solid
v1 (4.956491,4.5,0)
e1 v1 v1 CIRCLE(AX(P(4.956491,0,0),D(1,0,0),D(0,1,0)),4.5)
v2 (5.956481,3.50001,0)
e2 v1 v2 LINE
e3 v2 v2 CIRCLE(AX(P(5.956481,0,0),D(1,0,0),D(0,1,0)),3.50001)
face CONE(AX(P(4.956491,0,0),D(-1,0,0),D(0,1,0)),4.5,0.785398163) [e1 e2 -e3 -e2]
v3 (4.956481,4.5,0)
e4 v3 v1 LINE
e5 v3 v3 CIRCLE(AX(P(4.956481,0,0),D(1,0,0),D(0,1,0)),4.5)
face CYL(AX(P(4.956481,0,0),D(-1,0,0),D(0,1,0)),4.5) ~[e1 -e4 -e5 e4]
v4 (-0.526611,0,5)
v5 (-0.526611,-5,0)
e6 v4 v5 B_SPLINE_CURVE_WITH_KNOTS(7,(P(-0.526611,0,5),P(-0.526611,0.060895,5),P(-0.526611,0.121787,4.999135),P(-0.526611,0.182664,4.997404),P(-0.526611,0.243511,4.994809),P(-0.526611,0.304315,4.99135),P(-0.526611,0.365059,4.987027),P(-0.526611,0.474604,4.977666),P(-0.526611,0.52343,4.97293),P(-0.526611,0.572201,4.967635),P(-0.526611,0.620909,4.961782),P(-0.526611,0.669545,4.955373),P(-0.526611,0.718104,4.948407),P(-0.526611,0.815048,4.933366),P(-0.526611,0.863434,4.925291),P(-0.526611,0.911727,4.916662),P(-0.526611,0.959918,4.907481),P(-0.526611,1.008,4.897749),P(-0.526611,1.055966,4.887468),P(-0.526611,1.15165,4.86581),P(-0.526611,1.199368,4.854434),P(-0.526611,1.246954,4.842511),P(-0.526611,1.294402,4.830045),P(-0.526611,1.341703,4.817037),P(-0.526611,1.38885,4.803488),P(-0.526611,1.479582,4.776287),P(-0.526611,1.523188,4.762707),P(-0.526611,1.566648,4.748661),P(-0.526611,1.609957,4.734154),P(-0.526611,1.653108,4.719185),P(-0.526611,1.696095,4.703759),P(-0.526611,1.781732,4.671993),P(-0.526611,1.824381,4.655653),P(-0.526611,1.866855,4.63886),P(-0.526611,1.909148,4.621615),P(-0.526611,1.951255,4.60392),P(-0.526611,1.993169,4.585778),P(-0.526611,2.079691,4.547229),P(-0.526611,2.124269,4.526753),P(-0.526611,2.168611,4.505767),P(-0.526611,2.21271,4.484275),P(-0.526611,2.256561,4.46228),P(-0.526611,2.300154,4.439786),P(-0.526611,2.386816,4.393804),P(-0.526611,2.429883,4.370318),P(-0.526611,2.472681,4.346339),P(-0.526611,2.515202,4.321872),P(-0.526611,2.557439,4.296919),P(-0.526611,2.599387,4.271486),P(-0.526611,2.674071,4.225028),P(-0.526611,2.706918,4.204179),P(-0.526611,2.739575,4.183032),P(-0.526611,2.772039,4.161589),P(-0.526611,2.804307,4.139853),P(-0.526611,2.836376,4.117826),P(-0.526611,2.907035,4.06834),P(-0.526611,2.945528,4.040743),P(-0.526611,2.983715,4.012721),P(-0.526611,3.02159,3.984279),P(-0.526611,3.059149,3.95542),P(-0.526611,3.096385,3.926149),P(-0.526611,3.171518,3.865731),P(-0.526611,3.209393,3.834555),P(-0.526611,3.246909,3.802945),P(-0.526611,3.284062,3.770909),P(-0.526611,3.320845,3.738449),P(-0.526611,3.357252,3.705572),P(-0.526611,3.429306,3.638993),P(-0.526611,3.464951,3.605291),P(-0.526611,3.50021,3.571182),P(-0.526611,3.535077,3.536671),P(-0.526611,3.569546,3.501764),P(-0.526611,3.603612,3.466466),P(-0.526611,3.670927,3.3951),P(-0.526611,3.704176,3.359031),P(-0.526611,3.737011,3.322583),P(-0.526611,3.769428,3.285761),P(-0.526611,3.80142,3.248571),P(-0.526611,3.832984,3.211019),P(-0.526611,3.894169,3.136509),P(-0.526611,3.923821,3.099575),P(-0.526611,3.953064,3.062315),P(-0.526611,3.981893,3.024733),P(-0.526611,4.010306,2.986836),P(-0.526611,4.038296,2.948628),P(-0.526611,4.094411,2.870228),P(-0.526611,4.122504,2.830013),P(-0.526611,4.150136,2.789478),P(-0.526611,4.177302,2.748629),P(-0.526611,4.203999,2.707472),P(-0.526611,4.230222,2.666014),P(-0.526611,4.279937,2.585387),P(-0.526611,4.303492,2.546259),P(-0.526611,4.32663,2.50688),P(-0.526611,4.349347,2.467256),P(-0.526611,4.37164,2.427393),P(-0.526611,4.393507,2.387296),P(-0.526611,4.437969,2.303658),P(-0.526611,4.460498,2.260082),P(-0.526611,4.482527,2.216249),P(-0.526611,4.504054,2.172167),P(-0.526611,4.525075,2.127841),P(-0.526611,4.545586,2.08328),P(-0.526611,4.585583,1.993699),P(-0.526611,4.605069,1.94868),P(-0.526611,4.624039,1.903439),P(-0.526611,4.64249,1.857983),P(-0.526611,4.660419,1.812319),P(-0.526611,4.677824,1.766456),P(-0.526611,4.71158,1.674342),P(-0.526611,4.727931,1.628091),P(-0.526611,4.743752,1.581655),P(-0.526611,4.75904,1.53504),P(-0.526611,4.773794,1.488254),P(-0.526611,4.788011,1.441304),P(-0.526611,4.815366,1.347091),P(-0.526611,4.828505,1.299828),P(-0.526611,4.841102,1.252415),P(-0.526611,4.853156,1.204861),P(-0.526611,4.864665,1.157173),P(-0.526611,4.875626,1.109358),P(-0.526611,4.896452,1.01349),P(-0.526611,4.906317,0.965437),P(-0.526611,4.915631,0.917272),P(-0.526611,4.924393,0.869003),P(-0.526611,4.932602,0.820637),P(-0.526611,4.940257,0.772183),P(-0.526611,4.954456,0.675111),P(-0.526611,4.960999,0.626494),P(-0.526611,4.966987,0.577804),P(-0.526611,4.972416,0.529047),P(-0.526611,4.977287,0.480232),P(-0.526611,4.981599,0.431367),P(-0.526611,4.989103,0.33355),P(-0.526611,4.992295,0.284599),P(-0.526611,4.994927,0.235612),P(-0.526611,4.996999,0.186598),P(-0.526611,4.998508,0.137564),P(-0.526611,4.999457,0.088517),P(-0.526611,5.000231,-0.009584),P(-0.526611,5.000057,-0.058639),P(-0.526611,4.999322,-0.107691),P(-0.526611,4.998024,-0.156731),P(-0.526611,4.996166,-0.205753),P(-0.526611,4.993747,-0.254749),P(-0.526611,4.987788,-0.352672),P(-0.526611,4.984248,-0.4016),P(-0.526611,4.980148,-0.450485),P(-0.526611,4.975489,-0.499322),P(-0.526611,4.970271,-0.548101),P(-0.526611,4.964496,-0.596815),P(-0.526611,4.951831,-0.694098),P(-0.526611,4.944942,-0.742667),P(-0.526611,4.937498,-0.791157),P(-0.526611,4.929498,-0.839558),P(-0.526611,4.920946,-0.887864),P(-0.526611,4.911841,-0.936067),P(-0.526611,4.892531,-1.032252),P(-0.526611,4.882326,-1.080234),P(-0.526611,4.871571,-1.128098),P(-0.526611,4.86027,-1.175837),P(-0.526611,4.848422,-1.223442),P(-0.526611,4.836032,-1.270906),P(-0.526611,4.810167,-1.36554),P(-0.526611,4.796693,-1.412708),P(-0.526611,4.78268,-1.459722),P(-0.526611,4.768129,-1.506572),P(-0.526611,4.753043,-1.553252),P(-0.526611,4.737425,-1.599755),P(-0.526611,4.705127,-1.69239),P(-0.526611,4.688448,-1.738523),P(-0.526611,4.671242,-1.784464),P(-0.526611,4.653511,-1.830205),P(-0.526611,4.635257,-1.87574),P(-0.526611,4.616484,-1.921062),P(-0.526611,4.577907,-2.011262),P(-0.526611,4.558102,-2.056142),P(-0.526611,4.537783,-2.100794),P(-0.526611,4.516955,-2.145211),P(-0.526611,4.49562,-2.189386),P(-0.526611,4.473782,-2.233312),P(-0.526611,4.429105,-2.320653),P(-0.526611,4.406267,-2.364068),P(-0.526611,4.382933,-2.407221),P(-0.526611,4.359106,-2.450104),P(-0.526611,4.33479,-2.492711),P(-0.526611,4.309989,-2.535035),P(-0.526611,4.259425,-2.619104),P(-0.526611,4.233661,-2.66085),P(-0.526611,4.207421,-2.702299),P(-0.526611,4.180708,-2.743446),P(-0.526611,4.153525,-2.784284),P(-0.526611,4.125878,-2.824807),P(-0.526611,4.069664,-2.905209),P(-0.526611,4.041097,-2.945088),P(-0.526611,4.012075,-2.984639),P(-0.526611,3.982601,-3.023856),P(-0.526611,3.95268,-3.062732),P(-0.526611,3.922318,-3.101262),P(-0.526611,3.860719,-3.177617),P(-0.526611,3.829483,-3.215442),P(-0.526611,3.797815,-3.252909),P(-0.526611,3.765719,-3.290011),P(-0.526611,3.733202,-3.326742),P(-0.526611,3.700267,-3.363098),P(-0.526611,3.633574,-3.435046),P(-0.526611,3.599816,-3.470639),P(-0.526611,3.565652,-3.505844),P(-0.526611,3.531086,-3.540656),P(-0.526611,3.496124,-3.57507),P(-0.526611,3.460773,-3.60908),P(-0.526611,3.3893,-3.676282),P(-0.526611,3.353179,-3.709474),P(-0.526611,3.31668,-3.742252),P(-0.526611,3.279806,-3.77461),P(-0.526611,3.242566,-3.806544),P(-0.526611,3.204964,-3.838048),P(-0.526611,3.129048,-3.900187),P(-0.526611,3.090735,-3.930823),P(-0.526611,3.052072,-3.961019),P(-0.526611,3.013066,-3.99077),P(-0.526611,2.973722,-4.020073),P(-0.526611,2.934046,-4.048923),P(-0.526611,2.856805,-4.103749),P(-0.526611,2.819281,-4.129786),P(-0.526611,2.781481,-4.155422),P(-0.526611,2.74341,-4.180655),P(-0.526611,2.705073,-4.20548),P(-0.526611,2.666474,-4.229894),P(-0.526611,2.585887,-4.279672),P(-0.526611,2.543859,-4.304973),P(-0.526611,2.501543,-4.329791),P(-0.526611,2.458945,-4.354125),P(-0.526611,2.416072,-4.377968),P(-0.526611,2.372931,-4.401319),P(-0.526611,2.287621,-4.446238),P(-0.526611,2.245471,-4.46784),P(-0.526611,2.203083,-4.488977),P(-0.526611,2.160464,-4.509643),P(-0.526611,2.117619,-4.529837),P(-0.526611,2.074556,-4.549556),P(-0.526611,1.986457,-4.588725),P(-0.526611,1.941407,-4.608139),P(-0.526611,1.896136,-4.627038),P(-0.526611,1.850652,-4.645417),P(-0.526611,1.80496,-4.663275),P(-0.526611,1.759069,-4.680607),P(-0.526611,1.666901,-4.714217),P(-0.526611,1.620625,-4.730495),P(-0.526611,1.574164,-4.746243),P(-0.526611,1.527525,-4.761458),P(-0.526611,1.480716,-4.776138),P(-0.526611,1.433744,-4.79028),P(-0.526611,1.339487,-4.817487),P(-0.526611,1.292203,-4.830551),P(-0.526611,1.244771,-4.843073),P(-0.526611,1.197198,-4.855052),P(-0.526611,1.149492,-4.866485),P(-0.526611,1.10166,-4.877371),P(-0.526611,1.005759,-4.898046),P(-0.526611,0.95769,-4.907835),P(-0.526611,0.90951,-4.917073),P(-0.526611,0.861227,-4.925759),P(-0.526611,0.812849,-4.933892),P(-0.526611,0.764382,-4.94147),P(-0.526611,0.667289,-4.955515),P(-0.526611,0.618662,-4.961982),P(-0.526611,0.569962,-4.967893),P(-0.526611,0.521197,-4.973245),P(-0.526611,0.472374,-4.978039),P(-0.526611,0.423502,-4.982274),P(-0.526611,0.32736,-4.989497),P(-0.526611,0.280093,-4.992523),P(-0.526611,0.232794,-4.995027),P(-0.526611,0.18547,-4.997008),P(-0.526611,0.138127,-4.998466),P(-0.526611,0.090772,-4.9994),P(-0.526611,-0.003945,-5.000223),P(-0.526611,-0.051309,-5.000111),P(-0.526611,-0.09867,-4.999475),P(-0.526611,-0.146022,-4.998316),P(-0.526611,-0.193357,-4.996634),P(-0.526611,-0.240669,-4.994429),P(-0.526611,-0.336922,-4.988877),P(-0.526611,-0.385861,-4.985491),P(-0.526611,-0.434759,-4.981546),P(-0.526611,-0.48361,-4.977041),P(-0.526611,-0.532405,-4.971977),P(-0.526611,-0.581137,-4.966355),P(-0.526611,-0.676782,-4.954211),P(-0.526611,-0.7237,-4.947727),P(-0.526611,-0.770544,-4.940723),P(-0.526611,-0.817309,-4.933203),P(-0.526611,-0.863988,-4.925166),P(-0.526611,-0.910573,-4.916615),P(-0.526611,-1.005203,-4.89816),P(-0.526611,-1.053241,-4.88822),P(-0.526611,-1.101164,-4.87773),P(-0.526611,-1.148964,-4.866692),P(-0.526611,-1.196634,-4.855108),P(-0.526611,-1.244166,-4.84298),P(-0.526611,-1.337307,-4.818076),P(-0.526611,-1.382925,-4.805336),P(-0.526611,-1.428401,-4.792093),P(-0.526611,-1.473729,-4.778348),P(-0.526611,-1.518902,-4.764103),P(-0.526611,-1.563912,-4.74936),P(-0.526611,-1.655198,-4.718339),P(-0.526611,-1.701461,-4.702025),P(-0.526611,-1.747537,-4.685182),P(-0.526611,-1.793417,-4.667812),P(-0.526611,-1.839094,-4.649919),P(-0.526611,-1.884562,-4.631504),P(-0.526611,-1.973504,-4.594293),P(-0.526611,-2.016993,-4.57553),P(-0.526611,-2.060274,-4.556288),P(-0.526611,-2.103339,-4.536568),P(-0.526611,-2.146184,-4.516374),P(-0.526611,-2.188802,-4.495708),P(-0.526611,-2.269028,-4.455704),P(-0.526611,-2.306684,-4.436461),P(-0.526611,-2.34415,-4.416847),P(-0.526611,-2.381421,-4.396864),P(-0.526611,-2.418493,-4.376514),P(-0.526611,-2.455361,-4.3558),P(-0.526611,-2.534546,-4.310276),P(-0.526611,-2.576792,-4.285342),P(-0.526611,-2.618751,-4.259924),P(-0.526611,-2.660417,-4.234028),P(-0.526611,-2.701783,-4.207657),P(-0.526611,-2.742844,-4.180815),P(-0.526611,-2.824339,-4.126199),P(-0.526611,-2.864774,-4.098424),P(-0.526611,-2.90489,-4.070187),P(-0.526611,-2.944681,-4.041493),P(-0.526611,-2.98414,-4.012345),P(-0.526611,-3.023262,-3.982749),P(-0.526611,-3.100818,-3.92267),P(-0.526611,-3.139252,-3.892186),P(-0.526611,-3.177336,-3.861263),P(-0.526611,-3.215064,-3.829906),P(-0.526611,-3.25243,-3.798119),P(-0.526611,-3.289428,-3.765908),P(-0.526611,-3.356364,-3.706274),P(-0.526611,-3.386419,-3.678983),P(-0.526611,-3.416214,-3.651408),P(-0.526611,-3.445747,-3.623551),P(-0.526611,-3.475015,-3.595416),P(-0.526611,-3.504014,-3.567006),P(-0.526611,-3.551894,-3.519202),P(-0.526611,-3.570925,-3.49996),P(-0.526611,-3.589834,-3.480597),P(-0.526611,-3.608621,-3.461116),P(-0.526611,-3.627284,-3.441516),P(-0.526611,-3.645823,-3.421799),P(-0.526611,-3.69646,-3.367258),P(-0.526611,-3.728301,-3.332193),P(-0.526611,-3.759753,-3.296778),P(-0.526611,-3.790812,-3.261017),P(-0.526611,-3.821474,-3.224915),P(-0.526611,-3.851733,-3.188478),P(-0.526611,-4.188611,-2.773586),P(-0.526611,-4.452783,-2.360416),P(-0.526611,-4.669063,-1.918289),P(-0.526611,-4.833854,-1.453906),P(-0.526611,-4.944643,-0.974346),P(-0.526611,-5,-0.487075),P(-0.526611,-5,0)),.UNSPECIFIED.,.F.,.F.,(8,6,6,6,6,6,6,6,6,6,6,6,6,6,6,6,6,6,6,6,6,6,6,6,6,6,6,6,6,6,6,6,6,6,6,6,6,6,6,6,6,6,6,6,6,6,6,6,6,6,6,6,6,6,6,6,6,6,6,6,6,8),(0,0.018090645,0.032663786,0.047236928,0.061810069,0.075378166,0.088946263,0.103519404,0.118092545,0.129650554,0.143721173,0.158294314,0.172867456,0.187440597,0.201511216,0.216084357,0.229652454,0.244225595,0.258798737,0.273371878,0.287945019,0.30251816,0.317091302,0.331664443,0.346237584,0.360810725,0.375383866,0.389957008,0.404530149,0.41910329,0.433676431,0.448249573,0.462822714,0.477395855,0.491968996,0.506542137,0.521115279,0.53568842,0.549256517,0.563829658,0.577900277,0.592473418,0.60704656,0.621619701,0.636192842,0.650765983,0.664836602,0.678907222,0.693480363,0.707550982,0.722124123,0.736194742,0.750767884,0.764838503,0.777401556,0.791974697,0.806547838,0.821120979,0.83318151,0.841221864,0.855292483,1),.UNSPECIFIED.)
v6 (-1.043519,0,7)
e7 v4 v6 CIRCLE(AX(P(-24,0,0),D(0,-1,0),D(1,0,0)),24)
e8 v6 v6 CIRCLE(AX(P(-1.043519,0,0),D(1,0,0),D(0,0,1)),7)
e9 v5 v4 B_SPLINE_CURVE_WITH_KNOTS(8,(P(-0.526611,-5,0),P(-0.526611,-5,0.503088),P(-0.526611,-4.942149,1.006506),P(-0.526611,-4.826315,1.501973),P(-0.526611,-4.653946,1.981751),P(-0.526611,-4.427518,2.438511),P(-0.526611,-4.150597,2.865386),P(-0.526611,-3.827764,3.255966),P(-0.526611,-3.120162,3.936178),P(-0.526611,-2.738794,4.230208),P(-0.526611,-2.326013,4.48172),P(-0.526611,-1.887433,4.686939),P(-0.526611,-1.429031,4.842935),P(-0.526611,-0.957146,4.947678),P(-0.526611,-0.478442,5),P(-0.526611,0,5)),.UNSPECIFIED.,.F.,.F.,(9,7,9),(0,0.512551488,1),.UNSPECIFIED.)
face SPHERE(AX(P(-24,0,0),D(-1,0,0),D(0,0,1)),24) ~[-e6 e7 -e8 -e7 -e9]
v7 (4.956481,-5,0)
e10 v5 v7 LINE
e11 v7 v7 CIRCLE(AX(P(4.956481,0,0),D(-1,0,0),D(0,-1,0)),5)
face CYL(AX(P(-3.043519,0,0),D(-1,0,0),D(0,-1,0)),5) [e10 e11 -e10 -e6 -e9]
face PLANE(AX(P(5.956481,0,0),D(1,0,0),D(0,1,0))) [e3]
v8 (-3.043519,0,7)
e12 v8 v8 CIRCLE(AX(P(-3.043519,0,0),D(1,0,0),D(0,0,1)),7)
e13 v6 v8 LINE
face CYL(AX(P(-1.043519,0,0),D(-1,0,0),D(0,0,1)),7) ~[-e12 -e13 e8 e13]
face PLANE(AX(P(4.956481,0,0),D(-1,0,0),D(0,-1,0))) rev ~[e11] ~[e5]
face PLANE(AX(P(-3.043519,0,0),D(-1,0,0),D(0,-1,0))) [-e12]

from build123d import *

# Parameters (mm, degrees)
F2_R     = 5
F3_DEPTH = 8
F4_R     = 4.5
F5_DEPTH = 1
F6_SIZE  = 0.99999


# Not quite as in the source:
# - a fillet or chamfer is up to 0.001 mm smaller than in the source, because OpenCascade refuses the exact size


with BuildPart() as f1:
    # F0 (on Front) → F1 (revolve)
    with BuildSketch(Plane.XZ):
        with BuildLine():
            Line((-3.0435194335, 0), (0, 0))
            ThreePointArc((0, 0), (-0.2623133647, 3.5386767586), (-1.0435194335, 7))
            Line((-1.0435194335, 7), (-3.0435194335, 7))
            Line((-3.0435194335, 7), (-3.0435194335, 0))
        make_face()
    revolve(axis=Axis((-1.5217597168, 0, 0), (1, 0, 0)))

    # F2 (on face) → F3 (join)
    with BuildSketch(Plane(origin=(-3.0435194335, 0, 0), x_dir=(0, -1, 0), z_dir=(-1, 0, 0))):
        Circle(F2_R)
    extrude(amount=-F3_DEPTH)

    # F4 (on face) → F5 (join)
    with BuildSketch(Plane.YZ.offset(4.9564805665)):
        Circle(F4_R)
    extrude(amount=F5_DEPTH)

    # F6 (size 1 in the source; OpenCascade refuses exactly that, so slightly less here)
    f6_edges = [f1.edges().sort_by_distance(p)[0] for p in [
        (5.956481, -4.5, 0),
    ]]
    chamfer(f6_edges, length=F6_SIZE)


solid = f1.part
